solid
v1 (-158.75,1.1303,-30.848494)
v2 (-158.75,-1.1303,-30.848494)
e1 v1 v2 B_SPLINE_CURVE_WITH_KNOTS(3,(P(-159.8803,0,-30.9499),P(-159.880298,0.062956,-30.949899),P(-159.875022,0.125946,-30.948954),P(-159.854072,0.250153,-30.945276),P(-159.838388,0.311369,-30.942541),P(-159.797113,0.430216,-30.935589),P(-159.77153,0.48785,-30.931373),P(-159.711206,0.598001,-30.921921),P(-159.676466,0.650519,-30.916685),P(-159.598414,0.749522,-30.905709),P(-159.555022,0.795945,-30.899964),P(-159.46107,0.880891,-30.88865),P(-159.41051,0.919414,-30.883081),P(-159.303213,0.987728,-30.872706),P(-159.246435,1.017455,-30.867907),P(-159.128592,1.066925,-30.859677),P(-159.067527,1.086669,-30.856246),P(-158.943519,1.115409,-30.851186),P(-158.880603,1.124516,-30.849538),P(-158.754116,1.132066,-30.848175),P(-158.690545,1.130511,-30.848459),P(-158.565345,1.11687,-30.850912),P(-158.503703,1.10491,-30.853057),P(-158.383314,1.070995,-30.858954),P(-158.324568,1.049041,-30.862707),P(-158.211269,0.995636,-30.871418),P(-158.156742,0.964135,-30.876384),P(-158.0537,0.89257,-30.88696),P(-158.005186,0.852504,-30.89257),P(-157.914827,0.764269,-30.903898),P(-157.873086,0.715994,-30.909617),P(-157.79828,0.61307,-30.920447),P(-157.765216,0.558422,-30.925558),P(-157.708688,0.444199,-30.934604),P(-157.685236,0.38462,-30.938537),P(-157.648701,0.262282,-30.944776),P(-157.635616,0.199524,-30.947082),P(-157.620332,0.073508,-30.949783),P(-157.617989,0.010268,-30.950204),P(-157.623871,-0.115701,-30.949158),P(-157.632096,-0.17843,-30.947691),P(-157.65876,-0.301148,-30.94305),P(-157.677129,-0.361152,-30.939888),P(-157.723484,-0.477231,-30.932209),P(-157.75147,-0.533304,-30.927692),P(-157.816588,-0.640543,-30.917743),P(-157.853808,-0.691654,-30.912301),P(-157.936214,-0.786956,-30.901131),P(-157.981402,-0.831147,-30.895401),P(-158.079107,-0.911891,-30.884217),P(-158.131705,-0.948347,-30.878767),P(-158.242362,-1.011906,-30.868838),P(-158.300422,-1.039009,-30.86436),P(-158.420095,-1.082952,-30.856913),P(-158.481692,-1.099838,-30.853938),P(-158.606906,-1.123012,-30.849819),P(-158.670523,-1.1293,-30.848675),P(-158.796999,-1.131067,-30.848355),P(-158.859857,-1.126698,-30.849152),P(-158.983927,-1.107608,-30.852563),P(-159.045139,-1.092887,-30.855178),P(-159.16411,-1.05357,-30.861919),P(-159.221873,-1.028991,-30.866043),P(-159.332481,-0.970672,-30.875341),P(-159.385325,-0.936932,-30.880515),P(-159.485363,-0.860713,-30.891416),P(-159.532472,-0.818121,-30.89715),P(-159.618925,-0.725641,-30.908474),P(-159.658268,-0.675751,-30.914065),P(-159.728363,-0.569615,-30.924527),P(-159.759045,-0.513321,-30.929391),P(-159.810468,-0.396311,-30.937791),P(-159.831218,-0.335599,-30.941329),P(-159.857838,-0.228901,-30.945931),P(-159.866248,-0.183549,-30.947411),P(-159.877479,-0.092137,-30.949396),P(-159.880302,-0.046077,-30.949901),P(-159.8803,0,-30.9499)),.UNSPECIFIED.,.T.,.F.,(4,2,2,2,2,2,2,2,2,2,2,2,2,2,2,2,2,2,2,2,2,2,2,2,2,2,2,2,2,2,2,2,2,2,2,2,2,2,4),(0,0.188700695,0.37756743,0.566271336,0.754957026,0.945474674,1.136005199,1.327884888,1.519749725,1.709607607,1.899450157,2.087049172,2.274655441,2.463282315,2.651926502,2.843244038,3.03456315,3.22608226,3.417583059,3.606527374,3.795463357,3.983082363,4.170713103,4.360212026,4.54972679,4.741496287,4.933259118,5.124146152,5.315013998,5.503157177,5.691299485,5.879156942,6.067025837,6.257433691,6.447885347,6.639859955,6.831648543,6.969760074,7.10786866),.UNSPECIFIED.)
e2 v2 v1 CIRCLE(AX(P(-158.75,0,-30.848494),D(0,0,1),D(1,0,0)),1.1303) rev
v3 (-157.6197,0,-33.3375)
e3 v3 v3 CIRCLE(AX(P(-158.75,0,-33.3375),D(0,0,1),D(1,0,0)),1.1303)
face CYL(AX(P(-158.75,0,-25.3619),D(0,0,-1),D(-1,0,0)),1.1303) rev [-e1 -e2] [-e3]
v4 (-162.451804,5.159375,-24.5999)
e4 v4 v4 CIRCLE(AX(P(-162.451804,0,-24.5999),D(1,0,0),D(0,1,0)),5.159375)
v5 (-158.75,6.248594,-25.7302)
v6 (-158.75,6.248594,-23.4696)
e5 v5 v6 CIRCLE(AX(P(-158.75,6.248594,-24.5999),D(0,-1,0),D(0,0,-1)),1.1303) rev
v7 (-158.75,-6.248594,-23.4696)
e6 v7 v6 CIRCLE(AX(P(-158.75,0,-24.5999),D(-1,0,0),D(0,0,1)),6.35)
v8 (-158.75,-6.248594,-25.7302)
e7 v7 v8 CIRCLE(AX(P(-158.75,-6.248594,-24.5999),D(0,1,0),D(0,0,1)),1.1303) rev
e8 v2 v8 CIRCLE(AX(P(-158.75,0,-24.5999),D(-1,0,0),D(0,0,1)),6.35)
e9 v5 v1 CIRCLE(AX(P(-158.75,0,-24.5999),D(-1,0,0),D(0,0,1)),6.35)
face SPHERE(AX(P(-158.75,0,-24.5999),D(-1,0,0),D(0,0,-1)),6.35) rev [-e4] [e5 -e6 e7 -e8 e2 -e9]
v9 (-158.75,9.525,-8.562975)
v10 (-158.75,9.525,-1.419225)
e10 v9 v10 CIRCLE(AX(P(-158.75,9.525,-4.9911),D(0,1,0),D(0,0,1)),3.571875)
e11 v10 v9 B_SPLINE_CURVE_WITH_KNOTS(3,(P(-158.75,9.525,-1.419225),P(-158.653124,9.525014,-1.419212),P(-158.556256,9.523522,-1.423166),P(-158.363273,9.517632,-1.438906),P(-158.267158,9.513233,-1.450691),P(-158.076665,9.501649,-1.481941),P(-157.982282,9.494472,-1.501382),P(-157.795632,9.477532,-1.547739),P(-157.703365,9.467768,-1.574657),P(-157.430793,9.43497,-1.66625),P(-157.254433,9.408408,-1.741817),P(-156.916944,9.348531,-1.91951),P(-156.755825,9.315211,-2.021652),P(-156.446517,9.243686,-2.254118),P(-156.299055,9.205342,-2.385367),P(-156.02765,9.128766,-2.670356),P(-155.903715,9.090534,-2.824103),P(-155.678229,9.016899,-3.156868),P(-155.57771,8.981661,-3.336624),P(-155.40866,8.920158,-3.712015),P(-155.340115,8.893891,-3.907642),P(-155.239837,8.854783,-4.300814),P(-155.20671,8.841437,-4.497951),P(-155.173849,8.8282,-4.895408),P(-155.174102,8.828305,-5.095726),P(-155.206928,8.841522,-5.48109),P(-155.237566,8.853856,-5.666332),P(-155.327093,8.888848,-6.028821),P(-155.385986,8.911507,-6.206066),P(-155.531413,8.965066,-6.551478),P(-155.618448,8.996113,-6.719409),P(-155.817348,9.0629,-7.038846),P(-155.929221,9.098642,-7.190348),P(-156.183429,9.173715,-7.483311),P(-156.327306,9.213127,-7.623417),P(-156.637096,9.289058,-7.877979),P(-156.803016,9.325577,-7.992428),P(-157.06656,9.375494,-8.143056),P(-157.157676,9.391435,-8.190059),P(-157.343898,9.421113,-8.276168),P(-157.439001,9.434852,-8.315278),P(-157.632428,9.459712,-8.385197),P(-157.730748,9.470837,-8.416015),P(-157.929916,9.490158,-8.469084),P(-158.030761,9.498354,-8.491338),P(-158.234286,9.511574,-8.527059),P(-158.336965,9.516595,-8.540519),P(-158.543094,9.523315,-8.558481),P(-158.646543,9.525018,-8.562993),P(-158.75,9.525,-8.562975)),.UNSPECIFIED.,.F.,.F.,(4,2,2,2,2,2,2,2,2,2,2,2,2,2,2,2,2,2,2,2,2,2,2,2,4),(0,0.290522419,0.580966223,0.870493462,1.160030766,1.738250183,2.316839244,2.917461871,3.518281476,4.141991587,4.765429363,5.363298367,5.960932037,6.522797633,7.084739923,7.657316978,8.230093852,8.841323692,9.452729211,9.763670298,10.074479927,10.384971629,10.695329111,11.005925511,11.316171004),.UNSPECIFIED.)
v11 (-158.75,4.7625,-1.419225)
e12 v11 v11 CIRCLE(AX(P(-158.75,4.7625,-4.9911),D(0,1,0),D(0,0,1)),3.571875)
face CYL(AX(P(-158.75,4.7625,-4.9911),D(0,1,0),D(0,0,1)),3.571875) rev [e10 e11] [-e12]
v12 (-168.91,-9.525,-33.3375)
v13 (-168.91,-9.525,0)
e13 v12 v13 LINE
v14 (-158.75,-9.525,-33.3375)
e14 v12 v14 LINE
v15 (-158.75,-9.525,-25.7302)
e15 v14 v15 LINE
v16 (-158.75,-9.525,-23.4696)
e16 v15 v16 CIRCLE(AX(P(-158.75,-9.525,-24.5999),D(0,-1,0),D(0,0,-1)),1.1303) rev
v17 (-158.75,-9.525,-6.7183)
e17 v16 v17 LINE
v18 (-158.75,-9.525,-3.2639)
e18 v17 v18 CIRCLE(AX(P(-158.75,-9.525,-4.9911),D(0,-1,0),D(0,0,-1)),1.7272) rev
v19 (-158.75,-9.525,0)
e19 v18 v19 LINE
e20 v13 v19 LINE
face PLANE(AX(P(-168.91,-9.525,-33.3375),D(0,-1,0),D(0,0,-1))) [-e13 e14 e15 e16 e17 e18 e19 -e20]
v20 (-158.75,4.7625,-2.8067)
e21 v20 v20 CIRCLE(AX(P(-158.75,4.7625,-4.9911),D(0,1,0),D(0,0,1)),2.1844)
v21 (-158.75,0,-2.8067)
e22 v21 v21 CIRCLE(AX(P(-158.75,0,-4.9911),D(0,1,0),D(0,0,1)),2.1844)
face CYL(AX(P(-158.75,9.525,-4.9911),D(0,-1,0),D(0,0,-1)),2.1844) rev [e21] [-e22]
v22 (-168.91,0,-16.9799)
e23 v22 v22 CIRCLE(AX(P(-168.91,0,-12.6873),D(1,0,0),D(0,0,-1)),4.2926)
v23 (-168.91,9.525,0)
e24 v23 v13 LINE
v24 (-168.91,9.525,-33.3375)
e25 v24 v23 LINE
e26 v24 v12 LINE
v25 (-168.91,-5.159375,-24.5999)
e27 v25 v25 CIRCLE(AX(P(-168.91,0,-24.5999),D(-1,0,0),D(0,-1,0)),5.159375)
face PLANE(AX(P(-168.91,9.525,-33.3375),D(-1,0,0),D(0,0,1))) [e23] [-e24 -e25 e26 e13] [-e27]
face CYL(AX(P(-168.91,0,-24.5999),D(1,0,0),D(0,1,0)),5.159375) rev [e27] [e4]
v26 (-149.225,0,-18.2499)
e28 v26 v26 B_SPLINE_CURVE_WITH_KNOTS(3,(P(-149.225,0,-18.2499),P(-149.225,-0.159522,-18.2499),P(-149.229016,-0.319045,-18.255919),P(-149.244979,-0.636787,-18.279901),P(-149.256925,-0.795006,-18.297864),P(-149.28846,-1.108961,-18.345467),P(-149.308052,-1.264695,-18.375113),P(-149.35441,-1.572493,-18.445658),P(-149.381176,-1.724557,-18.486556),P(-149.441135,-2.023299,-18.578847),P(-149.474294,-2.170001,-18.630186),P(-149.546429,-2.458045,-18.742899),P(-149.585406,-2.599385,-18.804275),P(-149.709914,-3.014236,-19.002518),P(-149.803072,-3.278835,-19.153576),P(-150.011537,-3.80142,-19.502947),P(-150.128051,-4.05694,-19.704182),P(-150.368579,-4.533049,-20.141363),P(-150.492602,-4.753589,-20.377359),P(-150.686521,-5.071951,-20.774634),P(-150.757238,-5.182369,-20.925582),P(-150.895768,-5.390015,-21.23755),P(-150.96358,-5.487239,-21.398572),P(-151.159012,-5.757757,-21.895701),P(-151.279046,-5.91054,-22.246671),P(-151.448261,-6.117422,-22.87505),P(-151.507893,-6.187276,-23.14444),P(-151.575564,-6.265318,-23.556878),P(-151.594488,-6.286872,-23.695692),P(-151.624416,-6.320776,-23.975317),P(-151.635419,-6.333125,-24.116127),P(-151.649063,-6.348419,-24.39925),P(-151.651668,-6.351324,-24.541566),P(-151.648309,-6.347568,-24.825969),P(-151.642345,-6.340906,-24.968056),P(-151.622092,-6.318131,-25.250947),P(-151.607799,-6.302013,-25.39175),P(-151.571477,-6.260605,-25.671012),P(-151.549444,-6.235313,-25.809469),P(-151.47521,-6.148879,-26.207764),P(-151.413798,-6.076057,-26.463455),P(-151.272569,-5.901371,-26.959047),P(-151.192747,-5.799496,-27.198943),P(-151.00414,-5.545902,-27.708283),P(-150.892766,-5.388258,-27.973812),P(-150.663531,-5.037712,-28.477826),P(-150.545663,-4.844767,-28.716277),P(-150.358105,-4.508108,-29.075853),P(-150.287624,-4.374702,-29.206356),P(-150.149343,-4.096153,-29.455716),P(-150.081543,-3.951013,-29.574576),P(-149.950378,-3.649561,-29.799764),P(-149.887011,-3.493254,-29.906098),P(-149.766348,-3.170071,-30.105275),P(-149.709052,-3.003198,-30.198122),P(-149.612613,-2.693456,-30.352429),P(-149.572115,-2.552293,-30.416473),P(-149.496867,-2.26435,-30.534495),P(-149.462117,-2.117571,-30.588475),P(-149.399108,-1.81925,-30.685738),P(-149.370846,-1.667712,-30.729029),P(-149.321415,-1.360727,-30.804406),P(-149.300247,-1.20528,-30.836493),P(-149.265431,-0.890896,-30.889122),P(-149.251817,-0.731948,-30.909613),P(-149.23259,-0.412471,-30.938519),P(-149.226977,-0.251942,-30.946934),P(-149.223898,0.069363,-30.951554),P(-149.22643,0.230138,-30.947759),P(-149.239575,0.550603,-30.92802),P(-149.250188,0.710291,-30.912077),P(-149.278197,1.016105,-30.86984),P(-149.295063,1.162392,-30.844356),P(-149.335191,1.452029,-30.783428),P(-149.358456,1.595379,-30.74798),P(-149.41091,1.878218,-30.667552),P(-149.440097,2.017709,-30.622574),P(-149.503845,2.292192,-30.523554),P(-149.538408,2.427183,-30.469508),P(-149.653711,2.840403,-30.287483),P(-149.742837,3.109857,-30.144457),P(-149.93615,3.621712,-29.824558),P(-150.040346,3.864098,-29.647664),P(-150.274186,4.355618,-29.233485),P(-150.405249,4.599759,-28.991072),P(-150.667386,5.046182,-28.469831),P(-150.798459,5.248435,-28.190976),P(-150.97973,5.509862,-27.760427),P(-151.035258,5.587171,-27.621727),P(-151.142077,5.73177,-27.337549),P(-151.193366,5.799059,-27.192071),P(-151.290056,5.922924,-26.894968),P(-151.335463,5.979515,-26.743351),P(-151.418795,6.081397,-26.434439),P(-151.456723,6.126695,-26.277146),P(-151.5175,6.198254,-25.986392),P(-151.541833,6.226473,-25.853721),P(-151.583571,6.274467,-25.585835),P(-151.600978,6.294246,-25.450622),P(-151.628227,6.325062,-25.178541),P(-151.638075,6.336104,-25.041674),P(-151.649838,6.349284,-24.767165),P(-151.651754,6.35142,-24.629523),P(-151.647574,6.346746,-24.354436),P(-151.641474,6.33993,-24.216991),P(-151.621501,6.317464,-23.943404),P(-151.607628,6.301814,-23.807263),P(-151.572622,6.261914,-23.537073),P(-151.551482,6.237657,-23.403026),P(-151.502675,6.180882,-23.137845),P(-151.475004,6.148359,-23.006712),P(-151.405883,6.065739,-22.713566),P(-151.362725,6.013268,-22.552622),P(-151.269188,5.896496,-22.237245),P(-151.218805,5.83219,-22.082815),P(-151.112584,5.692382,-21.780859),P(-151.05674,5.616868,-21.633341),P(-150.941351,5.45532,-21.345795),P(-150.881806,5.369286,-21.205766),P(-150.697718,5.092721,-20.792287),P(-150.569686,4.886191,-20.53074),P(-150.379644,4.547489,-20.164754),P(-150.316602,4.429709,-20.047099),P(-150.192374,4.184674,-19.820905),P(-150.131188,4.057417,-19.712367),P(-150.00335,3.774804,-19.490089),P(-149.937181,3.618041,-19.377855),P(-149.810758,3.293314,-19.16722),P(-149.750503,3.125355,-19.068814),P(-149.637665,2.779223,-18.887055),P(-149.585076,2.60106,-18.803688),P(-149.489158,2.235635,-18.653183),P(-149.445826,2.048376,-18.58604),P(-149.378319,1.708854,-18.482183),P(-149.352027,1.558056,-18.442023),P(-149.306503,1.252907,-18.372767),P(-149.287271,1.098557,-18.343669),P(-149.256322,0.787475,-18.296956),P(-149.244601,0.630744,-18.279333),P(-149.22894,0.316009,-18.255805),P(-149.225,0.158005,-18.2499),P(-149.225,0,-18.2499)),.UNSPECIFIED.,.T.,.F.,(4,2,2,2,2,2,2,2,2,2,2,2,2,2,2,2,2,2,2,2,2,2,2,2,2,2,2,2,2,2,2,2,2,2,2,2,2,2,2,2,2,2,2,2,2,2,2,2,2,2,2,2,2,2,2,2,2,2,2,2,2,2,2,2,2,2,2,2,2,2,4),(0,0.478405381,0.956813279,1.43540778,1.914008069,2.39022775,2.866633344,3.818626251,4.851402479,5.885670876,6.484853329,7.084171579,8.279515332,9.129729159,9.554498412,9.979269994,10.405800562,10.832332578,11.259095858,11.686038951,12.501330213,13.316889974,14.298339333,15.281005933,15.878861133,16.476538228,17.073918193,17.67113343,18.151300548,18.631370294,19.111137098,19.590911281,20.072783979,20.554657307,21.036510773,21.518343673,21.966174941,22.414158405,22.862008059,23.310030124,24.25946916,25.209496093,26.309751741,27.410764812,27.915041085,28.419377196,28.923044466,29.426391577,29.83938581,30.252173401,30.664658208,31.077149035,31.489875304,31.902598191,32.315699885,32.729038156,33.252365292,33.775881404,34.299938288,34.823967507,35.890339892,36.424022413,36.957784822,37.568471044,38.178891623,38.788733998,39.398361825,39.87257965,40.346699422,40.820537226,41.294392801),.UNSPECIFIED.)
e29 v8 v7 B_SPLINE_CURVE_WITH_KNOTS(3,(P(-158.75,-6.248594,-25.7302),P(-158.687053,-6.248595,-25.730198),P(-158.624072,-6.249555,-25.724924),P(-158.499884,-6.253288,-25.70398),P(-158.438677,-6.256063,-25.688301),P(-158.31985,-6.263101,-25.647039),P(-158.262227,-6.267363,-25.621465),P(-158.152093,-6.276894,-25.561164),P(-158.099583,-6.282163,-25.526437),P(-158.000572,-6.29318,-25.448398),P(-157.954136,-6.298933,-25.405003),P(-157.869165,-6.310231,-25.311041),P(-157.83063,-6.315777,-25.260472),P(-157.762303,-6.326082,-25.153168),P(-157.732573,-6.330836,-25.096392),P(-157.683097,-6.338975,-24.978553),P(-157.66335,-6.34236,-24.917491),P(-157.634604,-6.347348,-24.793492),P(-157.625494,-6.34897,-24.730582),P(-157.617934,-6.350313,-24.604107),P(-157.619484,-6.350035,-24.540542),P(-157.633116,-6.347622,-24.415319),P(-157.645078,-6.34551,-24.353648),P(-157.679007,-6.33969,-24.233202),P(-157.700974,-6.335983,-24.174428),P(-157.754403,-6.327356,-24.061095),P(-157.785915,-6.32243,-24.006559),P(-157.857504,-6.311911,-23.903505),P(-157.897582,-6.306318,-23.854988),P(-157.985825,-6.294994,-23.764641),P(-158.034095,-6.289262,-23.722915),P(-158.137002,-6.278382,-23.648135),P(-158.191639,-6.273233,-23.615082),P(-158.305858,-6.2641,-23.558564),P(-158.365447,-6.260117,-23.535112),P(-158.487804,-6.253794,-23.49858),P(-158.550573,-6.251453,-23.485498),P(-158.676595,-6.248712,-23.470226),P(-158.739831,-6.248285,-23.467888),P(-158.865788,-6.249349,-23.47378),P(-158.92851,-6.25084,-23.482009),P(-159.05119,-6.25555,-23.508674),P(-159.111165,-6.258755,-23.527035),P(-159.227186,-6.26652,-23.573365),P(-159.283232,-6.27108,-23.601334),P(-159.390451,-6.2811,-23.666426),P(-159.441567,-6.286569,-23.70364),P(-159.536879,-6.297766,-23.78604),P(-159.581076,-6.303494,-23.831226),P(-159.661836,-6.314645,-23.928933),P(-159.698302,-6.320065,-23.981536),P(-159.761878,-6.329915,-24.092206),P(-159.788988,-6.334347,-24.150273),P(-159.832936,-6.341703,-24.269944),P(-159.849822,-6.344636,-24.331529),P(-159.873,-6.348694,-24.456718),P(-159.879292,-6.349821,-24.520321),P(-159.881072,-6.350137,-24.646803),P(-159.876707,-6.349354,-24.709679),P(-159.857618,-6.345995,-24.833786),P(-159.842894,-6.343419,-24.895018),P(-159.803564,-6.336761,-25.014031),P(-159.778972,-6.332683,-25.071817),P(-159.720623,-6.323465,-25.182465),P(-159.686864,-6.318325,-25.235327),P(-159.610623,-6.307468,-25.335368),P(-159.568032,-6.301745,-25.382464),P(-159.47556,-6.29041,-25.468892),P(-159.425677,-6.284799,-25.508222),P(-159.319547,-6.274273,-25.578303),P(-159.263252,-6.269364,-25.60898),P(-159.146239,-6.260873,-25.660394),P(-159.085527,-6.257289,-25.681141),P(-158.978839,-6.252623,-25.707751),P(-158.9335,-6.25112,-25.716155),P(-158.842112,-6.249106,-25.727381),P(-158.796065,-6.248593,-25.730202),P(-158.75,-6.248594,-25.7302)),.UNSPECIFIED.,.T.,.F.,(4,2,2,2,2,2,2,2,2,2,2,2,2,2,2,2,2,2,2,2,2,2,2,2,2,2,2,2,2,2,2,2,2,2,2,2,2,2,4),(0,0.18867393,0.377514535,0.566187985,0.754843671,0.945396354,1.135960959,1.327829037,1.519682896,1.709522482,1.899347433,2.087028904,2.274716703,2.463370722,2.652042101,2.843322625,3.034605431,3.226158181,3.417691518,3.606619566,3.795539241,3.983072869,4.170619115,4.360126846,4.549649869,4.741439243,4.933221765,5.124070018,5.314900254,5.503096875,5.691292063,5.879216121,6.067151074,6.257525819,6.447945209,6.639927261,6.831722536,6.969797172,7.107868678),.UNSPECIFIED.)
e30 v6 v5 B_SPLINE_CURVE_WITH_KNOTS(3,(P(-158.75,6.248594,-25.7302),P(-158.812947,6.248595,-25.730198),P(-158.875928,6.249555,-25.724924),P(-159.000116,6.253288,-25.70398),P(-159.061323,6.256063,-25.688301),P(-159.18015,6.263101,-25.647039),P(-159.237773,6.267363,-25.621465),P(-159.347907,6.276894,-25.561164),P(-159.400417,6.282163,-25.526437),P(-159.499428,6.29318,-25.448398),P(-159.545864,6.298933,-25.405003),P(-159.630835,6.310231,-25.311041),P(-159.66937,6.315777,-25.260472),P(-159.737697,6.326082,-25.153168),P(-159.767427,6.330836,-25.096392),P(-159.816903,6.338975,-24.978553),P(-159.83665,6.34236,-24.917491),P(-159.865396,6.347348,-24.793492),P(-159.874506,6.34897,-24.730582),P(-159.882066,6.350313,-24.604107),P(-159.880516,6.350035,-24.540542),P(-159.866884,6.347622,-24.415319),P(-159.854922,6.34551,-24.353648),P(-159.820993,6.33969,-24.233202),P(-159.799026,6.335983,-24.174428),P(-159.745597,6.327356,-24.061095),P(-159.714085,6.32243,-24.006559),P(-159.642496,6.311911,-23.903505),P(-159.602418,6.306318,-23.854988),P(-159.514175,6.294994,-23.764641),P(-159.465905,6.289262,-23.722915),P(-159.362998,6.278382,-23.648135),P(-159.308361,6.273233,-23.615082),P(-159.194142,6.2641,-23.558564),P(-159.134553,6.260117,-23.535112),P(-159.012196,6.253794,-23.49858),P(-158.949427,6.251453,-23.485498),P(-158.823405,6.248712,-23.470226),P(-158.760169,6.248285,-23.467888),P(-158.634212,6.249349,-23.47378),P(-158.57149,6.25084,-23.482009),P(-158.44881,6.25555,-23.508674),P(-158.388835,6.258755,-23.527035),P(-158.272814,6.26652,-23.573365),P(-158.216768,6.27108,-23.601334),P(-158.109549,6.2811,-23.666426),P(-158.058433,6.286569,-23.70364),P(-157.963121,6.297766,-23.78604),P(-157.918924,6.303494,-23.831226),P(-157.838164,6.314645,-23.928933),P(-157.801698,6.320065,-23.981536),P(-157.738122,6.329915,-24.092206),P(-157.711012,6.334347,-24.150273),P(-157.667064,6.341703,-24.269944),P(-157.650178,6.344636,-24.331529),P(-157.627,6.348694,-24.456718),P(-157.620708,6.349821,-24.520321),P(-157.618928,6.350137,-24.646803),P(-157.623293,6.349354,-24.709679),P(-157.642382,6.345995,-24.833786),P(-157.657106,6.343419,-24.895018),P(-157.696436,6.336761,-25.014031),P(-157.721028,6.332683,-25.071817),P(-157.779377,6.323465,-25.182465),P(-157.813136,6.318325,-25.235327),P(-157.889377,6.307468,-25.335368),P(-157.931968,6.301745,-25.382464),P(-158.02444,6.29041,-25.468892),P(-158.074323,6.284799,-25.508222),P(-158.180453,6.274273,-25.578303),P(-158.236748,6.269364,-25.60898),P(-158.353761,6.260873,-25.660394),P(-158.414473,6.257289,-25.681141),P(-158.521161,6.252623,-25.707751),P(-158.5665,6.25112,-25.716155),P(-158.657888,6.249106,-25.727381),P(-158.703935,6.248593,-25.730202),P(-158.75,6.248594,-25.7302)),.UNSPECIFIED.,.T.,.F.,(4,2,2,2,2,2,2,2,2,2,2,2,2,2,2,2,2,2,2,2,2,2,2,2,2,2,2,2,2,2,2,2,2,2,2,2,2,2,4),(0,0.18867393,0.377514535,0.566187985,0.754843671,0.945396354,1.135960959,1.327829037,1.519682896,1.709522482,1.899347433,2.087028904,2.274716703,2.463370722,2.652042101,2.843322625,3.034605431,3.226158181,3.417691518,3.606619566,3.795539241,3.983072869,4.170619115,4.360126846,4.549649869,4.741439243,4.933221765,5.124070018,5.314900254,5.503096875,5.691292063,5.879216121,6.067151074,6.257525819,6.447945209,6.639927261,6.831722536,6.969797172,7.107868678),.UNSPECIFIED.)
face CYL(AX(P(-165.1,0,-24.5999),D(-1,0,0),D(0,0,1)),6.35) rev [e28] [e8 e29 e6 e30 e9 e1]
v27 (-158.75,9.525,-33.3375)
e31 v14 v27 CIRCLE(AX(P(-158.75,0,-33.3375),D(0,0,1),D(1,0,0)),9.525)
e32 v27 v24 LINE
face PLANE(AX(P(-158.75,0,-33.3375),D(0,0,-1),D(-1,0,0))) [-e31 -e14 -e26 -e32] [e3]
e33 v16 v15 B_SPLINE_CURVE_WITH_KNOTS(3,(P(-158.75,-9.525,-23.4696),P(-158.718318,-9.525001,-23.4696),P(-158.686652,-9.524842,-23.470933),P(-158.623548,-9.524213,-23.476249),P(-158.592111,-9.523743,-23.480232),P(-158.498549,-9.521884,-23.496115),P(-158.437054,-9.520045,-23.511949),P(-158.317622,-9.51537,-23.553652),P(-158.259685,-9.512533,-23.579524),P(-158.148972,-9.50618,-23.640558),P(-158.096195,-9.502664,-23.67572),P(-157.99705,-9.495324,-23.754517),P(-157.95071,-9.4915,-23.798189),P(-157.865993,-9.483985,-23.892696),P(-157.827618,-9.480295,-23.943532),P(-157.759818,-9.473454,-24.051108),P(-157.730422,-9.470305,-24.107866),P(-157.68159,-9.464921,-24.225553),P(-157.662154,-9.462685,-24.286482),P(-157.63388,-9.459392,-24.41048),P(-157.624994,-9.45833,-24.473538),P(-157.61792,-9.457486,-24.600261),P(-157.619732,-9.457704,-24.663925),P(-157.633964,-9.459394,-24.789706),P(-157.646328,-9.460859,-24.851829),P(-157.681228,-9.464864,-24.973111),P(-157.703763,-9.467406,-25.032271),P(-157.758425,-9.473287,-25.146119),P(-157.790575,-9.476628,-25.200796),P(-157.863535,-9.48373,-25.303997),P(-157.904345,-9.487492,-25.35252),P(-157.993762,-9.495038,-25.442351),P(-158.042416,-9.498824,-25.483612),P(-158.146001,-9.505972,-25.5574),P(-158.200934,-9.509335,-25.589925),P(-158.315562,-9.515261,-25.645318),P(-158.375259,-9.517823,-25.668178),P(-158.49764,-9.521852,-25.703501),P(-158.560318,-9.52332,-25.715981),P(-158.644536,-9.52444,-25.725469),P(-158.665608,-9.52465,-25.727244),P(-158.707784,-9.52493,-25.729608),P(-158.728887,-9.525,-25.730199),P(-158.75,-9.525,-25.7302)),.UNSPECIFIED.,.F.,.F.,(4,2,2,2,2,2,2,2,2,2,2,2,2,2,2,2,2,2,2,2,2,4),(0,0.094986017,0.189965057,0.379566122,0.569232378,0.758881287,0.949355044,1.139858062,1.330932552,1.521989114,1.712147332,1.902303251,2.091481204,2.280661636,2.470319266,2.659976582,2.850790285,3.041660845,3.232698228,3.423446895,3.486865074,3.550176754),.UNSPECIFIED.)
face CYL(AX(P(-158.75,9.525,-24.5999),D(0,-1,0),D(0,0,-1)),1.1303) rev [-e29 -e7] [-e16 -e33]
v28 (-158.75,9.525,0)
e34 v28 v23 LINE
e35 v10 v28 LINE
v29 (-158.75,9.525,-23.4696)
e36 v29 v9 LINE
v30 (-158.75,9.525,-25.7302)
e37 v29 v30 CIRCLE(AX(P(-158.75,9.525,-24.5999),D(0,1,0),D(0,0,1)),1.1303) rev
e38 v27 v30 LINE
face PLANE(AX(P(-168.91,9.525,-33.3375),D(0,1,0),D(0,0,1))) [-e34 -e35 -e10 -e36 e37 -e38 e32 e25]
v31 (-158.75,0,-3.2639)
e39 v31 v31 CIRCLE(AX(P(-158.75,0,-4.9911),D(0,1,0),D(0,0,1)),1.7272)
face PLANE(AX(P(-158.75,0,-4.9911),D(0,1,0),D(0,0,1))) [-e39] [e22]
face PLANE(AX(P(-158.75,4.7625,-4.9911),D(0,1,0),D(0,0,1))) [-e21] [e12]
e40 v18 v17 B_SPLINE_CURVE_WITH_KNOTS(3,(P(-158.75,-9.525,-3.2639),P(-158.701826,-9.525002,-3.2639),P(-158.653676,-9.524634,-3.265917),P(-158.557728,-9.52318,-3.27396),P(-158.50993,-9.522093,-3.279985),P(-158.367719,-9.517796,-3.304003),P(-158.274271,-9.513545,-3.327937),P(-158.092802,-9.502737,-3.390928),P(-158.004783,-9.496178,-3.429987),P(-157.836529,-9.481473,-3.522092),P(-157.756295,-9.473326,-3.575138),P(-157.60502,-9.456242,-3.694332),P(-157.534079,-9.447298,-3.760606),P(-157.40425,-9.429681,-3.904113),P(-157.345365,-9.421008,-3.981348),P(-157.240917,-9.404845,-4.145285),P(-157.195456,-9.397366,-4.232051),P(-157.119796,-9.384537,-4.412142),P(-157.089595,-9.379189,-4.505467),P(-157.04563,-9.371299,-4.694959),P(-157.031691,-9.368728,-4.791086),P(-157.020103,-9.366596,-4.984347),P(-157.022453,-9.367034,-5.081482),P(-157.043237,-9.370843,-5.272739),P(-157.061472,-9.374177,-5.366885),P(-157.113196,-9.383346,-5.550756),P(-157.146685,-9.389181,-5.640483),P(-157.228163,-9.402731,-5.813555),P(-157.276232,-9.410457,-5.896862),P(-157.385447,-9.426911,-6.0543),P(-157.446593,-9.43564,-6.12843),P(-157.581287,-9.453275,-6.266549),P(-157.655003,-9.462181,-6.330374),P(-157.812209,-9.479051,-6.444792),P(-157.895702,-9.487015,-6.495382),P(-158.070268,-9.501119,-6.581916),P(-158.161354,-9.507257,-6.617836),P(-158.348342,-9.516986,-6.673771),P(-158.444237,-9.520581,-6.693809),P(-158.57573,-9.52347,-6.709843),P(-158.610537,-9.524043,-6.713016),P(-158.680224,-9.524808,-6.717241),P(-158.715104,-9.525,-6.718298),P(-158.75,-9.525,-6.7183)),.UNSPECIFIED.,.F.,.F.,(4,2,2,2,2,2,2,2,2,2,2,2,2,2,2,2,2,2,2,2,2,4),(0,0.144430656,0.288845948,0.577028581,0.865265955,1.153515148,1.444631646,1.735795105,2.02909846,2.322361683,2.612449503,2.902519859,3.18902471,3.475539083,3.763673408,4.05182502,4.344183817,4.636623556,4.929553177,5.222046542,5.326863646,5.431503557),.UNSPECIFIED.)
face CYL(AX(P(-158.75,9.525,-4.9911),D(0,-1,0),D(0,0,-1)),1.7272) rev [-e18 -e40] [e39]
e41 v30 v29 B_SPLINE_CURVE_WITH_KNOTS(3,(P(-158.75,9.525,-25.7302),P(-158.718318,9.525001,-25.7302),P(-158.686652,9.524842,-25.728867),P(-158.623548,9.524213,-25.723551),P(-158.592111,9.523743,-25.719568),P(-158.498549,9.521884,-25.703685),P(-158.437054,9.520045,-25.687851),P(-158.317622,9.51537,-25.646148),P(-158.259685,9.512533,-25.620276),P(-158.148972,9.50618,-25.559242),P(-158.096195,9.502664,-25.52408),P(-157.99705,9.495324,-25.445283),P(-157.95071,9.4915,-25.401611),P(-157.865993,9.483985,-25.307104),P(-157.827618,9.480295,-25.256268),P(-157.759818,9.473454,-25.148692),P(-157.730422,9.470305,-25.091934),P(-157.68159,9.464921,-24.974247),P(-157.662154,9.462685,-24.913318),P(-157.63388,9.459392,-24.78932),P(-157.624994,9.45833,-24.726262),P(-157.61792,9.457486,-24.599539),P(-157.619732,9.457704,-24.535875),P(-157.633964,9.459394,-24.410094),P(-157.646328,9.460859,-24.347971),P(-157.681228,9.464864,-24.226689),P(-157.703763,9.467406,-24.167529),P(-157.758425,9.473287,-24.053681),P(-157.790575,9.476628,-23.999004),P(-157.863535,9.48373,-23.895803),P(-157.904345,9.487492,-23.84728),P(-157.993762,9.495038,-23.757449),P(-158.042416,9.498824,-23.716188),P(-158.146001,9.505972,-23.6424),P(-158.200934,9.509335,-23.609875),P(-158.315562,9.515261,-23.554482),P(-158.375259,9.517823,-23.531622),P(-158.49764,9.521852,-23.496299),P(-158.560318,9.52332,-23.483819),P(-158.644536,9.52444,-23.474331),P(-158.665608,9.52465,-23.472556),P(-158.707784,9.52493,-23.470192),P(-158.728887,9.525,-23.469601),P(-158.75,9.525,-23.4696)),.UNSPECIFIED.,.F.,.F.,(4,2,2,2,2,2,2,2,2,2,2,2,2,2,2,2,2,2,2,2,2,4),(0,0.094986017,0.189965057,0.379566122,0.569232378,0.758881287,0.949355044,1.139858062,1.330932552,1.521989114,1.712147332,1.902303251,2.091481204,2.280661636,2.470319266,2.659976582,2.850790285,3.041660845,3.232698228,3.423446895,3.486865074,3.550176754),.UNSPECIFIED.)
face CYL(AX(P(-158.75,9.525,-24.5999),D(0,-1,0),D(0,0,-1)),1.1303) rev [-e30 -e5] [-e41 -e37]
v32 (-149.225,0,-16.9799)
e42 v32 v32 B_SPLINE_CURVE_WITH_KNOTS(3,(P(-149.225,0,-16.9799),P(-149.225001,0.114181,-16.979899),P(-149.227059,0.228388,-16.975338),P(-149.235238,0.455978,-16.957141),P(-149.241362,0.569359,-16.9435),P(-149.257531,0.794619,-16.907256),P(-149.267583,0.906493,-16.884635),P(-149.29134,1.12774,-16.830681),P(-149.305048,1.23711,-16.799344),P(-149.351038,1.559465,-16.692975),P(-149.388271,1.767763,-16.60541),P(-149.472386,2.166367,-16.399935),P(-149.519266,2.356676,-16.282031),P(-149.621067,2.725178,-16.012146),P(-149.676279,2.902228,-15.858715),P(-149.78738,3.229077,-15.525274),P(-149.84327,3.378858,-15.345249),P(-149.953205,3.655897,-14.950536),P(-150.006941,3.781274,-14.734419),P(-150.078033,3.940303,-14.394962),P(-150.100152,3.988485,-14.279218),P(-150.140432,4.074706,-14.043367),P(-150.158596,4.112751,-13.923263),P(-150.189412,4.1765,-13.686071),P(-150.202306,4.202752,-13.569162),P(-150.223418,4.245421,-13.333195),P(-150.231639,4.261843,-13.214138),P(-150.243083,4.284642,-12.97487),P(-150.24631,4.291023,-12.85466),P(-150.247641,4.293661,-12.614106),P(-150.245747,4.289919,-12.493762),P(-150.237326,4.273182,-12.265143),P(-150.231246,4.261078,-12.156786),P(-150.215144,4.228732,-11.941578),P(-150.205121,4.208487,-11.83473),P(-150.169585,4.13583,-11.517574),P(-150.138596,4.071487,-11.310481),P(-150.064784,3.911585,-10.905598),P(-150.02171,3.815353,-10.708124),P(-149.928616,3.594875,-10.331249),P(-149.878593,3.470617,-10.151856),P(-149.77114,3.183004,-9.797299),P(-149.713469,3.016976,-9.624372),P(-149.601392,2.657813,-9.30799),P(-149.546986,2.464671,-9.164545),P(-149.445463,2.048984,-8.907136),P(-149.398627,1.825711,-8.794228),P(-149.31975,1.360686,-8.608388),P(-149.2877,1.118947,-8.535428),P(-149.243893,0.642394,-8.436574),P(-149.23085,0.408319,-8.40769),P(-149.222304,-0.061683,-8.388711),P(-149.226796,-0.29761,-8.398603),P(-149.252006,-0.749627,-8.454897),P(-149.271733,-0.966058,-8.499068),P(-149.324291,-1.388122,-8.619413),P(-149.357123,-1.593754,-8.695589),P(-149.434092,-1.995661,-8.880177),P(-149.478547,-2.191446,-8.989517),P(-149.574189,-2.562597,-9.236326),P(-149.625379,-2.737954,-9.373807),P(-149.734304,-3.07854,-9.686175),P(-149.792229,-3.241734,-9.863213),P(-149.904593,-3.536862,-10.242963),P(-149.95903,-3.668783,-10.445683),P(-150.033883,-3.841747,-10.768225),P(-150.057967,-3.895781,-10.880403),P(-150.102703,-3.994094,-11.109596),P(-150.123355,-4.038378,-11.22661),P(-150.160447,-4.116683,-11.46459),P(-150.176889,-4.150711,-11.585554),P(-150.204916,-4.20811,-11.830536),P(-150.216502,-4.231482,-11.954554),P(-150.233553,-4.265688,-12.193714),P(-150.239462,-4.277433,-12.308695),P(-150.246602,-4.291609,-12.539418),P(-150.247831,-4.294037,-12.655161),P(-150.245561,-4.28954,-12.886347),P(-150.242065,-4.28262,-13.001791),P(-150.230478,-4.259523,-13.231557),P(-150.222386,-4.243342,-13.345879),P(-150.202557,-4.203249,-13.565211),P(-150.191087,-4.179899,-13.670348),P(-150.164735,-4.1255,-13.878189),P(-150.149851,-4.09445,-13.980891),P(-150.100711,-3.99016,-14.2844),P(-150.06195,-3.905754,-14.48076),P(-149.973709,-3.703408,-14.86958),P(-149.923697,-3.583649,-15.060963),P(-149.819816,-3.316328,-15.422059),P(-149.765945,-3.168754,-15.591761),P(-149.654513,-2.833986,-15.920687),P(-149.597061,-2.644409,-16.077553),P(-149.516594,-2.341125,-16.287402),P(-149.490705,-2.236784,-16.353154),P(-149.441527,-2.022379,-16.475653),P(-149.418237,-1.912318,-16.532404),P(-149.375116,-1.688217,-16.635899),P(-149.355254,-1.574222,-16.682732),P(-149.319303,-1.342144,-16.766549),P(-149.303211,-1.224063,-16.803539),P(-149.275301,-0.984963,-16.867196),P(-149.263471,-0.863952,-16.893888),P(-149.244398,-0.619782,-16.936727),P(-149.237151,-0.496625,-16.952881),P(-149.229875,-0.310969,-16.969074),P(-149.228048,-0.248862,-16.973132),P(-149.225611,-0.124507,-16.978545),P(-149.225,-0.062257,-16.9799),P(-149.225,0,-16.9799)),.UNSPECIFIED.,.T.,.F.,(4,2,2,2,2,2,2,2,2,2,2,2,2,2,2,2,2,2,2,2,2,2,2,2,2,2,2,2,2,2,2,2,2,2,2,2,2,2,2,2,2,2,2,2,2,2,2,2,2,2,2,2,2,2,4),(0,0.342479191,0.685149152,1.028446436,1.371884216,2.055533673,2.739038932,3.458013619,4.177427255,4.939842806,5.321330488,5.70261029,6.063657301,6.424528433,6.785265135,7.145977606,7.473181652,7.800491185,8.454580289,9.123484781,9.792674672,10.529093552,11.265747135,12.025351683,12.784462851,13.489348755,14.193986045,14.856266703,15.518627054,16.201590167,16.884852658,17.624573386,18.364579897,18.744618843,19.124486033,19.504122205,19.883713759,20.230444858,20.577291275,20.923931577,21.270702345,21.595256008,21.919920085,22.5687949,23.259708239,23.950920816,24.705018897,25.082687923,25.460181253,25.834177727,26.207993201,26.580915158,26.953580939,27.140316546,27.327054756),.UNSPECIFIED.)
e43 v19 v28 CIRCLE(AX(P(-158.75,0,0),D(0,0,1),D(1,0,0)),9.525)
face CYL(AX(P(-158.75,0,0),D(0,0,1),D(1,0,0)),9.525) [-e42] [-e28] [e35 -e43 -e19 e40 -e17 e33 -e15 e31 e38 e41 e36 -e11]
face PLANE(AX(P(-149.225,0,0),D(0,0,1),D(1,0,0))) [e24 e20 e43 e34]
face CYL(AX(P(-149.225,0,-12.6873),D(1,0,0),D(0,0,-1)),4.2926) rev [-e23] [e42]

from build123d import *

# Parameters (mm, degrees)
SKETCH1_W              = 9.525
SKETCH1_H              = 33.3375
COMBINE2_START         = -168.91
COMBINE2_OUTLINE_R     = 5.159375
COMBINE2_OUTLINE_R_2   = 4.2926
COMBINE2_DEPTH         = 20.91
COMBINE2_START_2       = -158.802197
COMBINE2_2_OUTLINE_R   = 6.35
COMBINE2_2_OUTLINE_R_2 = 5.159375
COMBINE2_2_DEPTH       = 10.802197
COMBINE2_3_OUTLINE_W   = 19.05
COMBINE2_3_OUTLINE_H   = 33.3375
COMBINE2_3_OUTLINE_R   = 6.35
COMBINE2_3_OUTLINE_R_2 = 4.2926
COMBINE2_3_DEPTH       = 10.107803
COMBINE2_4_OUTLINE_R   = 6.35
COMBINE2_4_OUTLINE_R_2 = 5.159375
COMBINE2_4_DEPTH       = 6.5881249
COMBINE2_START_3       = -11
COMBINE2_5_OUTLINE_R   = 1.7272
COMBINE2_5_OUTLINE_R_2 = 1.1303
COMBINE2_5_DEPTH       = 20.525
COMBINE2_START_4       = 4.7625
COMBINE2_6_OUTLINE_R   = 3.571875
COMBINE2_6_OUTLINE_R_2 = 1.7272
COMBINE2_6_DEPTH       = 4.7625
COMBINE2_7_OUTLINE_R   = 2.1844
COMBINE2_7_OUTLINE_R_2 = 1.7272
COMBINE2_7_DEPTH       = 4.7625


with BuildPart() as part:
    # Sketch1 → Revolve1 (revolve)
    with BuildSketch(Plane(origin=(0, 0, 0), x_dir=(1, 0, 0), z_dir=(0, 1, 0))):
        with Locations((-153.9875, 16.66875)):
            Rectangle(SKETCH1_W, SKETCH1_H)
    revolve(axis=Axis((-158.75, 0, 0), (0, 0, -1)))

    # Combine2: read off the stored shape, not the designer's step
    # Combine2 outline → Combine2 (cut)
    with BuildSketch(Plane.YZ.offset(COMBINE2_START)):
        with Locations((0, -24.5999)):
            Circle(COMBINE2_OUTLINE_R)
        with Locations((0, -12.6873)):
            Circle(COMBINE2_OUTLINE_R_2)
    extrude(amount=COMBINE2_DEPTH, mode=Mode.SUBTRACT)

    # Combine2 2 outline → Combine2 2 (cut)
    with BuildSketch(Plane.YZ.offset(COMBINE2_START_2)):
        with Locations((0, -24.5999)):
            Circle(COMBINE2_2_OUTLINE_R)
        with Locations((0, -24.5999)):
            Circle(COMBINE2_2_OUTLINE_R_2, mode=Mode.SUBTRACT)
    extrude(amount=COMBINE2_2_DEPTH, mode=Mode.SUBTRACT)

    # Combine2 3 outline → Combine2 3 (add)
    with BuildSketch(Plane.YZ.offset(COMBINE2_START)):
        with Locations((0, -16.66875)):
            Rectangle(COMBINE2_3_OUTLINE_W, COMBINE2_3_OUTLINE_H)
        with Locations((0, -24.5999)):
            Circle(COMBINE2_3_OUTLINE_R, mode=Mode.SUBTRACT)
        with Locations((0, -12.6873)):
            Circle(COMBINE2_3_OUTLINE_R_2, mode=Mode.SUBTRACT)
    extrude(amount=COMBINE2_3_DEPTH)

    # Combine2 4 outline → Combine2 4 (add)
    with BuildSketch(Plane.YZ.offset(COMBINE2_START)):
        with Locations((0, -24.5999)):
            Circle(COMBINE2_4_OUTLINE_R)
        with Locations((0, -24.5999)):
            Circle(COMBINE2_4_OUTLINE_R_2, mode=Mode.SUBTRACT)
    extrude(amount=COMBINE2_4_DEPTH)

    # Combine2 5 outline → Combine2 5 (cut)
    with BuildSketch(Plane(origin=(0, 0, 0), x_dir=(1, 0, 0), z_dir=(0, 1, 0)).offset(COMBINE2_START_3)):
        with Locations((-158.75, 4.9911)):
            Circle(COMBINE2_5_OUTLINE_R)
        with Locations((-158.75, 24.5999)):
            Circle(COMBINE2_5_OUTLINE_R_2)
    extrude(amount=COMBINE2_5_DEPTH, mode=Mode.SUBTRACT)

    # Combine2 6 outline → Combine2 6 (cut)
    with BuildSketch(Plane(origin=(0, 0, 0), x_dir=(1, 0, 0), z_dir=(0, 1, 0)).offset(COMBINE2_START_4)):
        with Locations((-158.75, 4.9911)):
            Circle(COMBINE2_6_OUTLINE_R)
        with Locations((-158.75, 4.9911)):
            Circle(COMBINE2_6_OUTLINE_R_2, mode=Mode.SUBTRACT)
    extrude(amount=COMBINE2_6_DEPTH, mode=Mode.SUBTRACT)

    # Combine2 7 outline → Combine2 7 (cut)
    with BuildSketch(Plane(origin=(0, 0, 0), x_dir=(1, 0, 0), z_dir=(0, 1, 0))):
        with Locations((-158.75, 4.9911)):
            Circle(COMBINE2_7_OUTLINE_R)
        with Locations((-158.75, 4.9911)):
            Circle(COMBINE2_7_OUTLINE_R_2, mode=Mode.SUBTRACT)
    extrude(amount=COMBINE2_7_DEPTH, mode=Mode.SUBTRACT)

    # Combine2 8 outline → Combine2 8 (revolve, cut)
    with BuildSketch(Plane(origin=(-158.75, 0, 0), x_dir=(1, 0, 0), z_dir=(0, -1, 0))):
        with BuildLine():
            Line((0, -18.2499), (0, -33.3375))
            Line((0, -33.3375), (1.1303, -33.3375))
            Line((1.1303, -33.3375), (1.130299842, -30.848493624))
            ThreePointArc((1.130299842, -30.848493624), (6.324597596, -24.032480185), (0, -18.2499))
        make_face()
    revolve(axis=Axis((-158.75, 0, 0), (0, 0, 1)), mode=Mode.SUBTRACT)


solid = part.part
